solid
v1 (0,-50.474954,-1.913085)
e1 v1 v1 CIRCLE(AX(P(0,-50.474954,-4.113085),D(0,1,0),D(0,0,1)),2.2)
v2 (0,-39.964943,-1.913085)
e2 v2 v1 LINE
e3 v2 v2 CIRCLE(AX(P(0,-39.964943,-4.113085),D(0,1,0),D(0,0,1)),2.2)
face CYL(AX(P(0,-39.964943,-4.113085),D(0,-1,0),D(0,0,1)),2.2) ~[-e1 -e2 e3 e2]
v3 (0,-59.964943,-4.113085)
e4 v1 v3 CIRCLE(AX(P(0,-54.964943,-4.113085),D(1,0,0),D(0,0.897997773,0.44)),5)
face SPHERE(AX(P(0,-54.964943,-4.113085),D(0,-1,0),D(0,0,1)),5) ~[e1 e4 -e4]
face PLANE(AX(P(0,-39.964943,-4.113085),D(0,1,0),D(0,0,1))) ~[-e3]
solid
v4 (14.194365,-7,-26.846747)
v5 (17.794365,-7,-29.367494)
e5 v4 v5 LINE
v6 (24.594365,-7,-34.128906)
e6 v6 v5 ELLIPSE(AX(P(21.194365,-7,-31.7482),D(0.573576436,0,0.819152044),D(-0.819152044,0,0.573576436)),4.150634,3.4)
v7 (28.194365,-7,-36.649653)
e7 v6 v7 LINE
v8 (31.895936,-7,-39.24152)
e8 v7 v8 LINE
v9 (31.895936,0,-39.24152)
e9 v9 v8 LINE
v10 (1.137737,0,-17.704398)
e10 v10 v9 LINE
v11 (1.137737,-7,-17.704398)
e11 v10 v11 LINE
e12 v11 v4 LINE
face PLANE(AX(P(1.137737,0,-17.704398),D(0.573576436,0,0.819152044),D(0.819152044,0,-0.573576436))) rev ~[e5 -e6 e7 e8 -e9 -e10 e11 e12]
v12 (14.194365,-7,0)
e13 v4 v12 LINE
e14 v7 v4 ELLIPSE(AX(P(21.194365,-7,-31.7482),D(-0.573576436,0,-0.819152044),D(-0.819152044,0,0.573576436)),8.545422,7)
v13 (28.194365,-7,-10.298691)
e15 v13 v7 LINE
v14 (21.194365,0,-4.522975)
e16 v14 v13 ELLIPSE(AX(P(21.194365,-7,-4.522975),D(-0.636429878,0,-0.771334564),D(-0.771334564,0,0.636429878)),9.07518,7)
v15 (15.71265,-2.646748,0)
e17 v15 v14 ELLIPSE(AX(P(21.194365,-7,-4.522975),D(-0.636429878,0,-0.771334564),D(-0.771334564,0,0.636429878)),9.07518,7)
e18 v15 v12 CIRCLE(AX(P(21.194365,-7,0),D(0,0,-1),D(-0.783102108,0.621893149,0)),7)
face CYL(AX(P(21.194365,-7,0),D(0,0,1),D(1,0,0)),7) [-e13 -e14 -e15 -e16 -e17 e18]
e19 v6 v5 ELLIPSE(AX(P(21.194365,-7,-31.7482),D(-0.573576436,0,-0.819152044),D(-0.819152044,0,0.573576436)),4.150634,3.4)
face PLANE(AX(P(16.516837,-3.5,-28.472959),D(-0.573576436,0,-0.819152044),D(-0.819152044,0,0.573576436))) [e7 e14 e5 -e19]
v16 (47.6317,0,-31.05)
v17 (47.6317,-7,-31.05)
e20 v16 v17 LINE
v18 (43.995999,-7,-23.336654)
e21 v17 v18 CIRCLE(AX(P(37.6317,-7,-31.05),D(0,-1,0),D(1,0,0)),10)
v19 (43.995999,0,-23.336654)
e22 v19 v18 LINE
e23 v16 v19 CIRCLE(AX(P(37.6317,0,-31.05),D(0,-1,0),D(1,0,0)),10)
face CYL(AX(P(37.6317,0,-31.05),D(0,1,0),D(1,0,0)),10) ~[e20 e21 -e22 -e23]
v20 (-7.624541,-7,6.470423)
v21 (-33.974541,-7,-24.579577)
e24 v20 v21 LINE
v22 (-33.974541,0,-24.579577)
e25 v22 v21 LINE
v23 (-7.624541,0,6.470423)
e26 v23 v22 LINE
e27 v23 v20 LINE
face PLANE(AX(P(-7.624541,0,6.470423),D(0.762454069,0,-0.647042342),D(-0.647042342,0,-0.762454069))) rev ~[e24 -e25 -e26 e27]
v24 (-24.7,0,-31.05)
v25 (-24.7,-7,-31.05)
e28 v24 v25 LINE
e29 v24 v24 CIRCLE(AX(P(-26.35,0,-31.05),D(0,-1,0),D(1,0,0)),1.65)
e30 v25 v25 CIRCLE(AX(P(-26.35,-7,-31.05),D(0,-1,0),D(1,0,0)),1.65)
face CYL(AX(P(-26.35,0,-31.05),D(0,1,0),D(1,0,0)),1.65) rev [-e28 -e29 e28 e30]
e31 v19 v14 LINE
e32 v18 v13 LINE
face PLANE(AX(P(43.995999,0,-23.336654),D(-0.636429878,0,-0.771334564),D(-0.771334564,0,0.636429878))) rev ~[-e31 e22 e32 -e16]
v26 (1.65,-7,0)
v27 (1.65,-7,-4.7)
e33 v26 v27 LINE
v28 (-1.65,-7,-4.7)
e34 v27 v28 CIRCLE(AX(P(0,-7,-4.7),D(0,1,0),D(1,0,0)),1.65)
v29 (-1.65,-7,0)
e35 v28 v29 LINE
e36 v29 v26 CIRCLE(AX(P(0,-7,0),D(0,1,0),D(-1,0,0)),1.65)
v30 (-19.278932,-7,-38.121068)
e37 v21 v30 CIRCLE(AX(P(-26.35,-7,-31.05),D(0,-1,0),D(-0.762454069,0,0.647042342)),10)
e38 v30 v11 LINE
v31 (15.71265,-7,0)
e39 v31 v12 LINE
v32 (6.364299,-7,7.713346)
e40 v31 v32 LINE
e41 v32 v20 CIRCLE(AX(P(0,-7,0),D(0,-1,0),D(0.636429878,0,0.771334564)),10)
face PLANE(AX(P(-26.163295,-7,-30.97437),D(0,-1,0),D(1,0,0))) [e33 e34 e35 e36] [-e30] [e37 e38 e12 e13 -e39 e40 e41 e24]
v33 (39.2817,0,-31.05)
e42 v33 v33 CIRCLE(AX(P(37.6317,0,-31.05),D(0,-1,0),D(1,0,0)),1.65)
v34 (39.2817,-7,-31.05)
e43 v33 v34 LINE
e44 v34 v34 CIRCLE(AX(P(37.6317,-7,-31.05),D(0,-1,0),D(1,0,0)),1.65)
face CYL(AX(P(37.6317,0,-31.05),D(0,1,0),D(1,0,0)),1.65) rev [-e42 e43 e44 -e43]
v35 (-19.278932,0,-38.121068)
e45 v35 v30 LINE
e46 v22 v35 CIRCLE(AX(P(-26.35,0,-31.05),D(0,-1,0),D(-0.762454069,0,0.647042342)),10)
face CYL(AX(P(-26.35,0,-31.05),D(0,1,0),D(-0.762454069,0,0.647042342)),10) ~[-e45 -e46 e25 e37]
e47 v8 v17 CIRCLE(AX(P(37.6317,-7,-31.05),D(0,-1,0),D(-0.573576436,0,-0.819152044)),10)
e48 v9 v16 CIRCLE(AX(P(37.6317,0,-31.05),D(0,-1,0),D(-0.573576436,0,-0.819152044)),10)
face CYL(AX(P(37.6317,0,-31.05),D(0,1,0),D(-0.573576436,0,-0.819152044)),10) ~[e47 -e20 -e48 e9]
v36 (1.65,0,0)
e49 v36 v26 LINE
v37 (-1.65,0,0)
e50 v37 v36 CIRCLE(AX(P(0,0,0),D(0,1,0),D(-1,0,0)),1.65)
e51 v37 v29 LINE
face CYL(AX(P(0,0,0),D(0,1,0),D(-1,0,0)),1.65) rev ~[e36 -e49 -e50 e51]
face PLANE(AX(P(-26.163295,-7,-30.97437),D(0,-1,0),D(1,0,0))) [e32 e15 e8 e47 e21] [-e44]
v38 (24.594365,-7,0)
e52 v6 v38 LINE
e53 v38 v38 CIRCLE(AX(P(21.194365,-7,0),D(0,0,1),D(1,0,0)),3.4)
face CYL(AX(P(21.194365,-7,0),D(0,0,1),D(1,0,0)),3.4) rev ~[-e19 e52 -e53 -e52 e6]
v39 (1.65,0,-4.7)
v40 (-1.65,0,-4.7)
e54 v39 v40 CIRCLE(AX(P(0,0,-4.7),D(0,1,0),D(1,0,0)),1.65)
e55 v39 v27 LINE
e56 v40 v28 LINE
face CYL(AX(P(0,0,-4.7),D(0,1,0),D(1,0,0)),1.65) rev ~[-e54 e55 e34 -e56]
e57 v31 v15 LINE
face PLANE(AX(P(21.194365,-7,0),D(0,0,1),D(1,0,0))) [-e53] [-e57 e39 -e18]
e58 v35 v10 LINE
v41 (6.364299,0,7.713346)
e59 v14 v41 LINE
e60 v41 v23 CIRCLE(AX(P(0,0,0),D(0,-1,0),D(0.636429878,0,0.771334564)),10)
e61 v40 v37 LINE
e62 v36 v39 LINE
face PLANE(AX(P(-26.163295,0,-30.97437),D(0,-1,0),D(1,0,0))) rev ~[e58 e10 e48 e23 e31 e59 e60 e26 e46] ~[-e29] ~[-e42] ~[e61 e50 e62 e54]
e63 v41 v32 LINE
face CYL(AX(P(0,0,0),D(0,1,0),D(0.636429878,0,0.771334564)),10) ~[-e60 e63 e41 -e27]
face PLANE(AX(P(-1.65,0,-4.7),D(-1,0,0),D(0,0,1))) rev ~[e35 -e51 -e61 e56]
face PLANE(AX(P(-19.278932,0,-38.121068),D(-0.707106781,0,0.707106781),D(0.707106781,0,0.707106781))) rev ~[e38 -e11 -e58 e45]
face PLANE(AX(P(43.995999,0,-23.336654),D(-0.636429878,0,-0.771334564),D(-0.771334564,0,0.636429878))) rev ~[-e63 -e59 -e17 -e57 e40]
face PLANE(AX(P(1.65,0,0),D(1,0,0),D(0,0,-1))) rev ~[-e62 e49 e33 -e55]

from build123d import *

# Parameters (mm, degrees)
F0_R     = 1.65
F1_DEPTH = 7
F4_R     = 7
F4_R_2   = 3.4
F5_REACH = 60.8499898732
F6_DEPTH = 41.051


with BuildPart() as f1:
    # F0 (on Front) → F1 (new body)
    with BuildSketch(Plane.XZ):
        with BuildLine():
            ThreePointArc((-19.2789321881, -38.1210678119), (-17.1112046749, -34.8768343237), (-16.35, -31.05))
            ThreePointArc((-16.35, -31.05), (-22.9036546106, -21.6626306424), (-33.9745406914, -24.5795765791))
            ThreePointArc((-33.9745406914, -24.5795765791), (-33.1263986939, -38.4039391309), (-19.2789321881, -38.1210678119))
        make_face()
        with Locations((-26.35, -31.05)):
            Circle(F0_R, mode=Mode.SUBTRACT)
        with BuildLine():
            ThreePointArc((-33.9745406914, -24.5795765791), (-22.9036546106, -21.6626306424), (-16.35, -31.05))
            ThreePointArc((-16.35, -31.05), (-17.1112046749, -34.8768343237), (-19.2789321881, -38.1210678119))
            Line((-19.2789321881, -38.1210678119), (1.1377374189, -17.7043982048))
            Line((1.1377374189, -17.7043982048), (-5.7357643635, -12.8915204429))
            ThreePointArc((-5.7357643635, -12.8915204429), (-9.3541818752, -8.2354322855), (-9.7199537036, -2.35))
            ThreePointArc((-9.7199537036, -2.35), (-9.7292260116, 2.3113115789), (-7.6245406914, 6.4704234209))
            Line((-7.6245406914, 6.4704234209), (-33.9745406914, -24.5795765791))
        make_face()
        with BuildLine():
            ThreePointArc((6.3642987803, 7.7133456447), (-0.8850233512, 9.9607596933), (-7.6245406914, 6.4704234209))
            ThreePointArc((-7.6245406914, 6.4704234209), (-9.7292260116, 2.3113115789), (-9.7199537036, -2.35))
            ThreePointArc((-9.7199537036, -2.35), (0, 5.3), (9.7199537036, -2.35))
            ThreePointArc((9.7199537036, -2.35), (9.9297416139, -1.1833137716), (10, 0))
            ThreePointArc((10, 0), (9.0455234178, 4.2636259332), (6.3642987803, 7.7133456447))
        make_face()
        with BuildLine():
            Line((-5.7357643635, -12.8915204429), (1.1377374189, -17.7043982048))
            Line((1.1377374189, -17.7043982048), (7.0710678119, -11.7710678119))
            ThreePointArc((7.0710678119, -11.7710678119), (0.8715574275, -14.6619469809), (-5.7357643635, -12.8915204429))
        make_face()
        with BuildLine():
            Line((7.0710678119, -11.7710678119), (1.1377374189, -17.7043982048))
            Line((1.1377374189, -17.7043982048), (31.8959356141, -39.2415204429))
            ThreePointArc((31.8959356141, -39.2415204429), (29.6730596921, -24.9952460987), (43.995998758, -23.3366543553))
            Line((43.995998758, -23.3366543553), (6.3642987803, 7.7133456447))
            ThreePointArc((6.3642987803, 7.7133456447), (9.0455234178, 4.2636259332), (10, 0))
            ThreePointArc((10, 0), (9.9297416139, -1.1833137716), (9.7199537036, -2.35))
            ThreePointArc((9.7199537036, -2.35), (9.9297416139, -3.5166862284), (10, -4.7))
            ThreePointArc((10, -4.7), (9.2387953251, -8.5268343237), (7.0710678119, -11.7710678119))
        make_face()
        with BuildLine():
            ThreePointArc((43.995998758, -23.3366543553), (29.6730596921, -24.9952460987), (31.8959356141, -39.2415204429))
            ThreePointArc((31.8959356141, -39.2415204429), (42.24918611, -39.9201083318), (47.6316999777, -31.05))
            ThreePointArc((47.6316999777, -31.05), (46.6772233954, -26.7863740668), (43.995998758, -23.3366543553))
        make_face()
        with Locations((37.6316999777, -31.05)):
            Circle(F0_R, mode=Mode.SUBTRACT)
        with BuildLine():
            ThreePointArc((9.7199537036, -2.35), (0, 5.3), (-9.7199537036, -2.35))
            ThreePointArc((-9.7199537036, -2.35), (0, -10), (9.7199537036, -2.35))
        make_face()
        with BuildLine():
            ThreePointArc((-1.65, 0), (0, 1.65), (1.65, 0))
            Line((1.65, 0), (1.65, -4.7))
            ThreePointArc((1.65, -4.7), (0, -6.35), (-1.65, -4.7))
            Line((-1.65, -4.7), (-1.65, 0))
        make_face(mode=Mode.SUBTRACT)
        with BuildLine():
            ThreePointArc((9.7199537036, -2.35), (0, -10), (-9.7199537036, -2.35))
            ThreePointArc((-9.7199537036, -2.35), (-9.3541818752, -8.2354322855), (-5.7357643635, -12.8915204429))
            ThreePointArc((-5.7357643635, -12.8915204429), (0.8715574275, -14.6619469809), (7.0710678119, -11.7710678119))
            ThreePointArc((7.0710678119, -11.7710678119), (9.2387953251, -8.5268343237), (10, -4.7))
            ThreePointArc((10, -4.7), (9.9297416139, -3.5166862284), (9.7199537036, -2.35))
        make_face()
    extrude(amount=F1_DEPTH)

    f5_end = Plane(origin=(16.5168365165, -3.5, -28.4729593239), x_dir=(-0.8191520443, 0, 0.5735764364), z_dir=(-0.5735764364, 0, -0.8191520443))
    # F4 (on Top) → F5 (join, up to a plane its end follows)
    with BuildSketch(Plane.XY):
        with Locations((21.1943648756, -7)):
            Circle(F4_R)
        with Locations((21.1943648756, -7)):
            Circle(F4_R_2, mode=Mode.SUBTRACT)
    f5_long = extrude(amount=-F5_REACH, mode=Mode.PRIVATE)
    add(split(f5_long, bisect_by=f5_end, keep=Keep.BOTTOM, mode=Mode.PRIVATE))

    # F4 (on Top) → F6 (cut, through all)
    with BuildSketch(Plane.XY):
        with Locations((21.1943648756, -7)):
            Circle(F4_R_2)
    extrude(amount=-F6_DEPTH, mode=Mode.SUBTRACT)


with BuildPart() as f3:
    # F2 (on Right) → F3 (revolve)
    with BuildSketch(Plane.YZ):
        with BuildLine():
            Line((-39.9649430722, -1.9130847832), (-50.4749542081, -1.9130847832))
            ThreePointArc((-50.4749542081, -1.9130847832), (-56.0941143788, 0.7577439102), (-59.9649430722, -4.1130847832))
            Line((-59.9649430722, -4.1130847832), (-39.9649430722, -4.1130847832))
            Line((-39.9649430722, -4.1130847832), (-39.9649430722, -1.9130847832))
        make_face()
    revolve(axis=Axis((0, -49.9649430722, -4.1130847832), (0, 1, 0)))


solid = Compound([f1.part, f3.part])
